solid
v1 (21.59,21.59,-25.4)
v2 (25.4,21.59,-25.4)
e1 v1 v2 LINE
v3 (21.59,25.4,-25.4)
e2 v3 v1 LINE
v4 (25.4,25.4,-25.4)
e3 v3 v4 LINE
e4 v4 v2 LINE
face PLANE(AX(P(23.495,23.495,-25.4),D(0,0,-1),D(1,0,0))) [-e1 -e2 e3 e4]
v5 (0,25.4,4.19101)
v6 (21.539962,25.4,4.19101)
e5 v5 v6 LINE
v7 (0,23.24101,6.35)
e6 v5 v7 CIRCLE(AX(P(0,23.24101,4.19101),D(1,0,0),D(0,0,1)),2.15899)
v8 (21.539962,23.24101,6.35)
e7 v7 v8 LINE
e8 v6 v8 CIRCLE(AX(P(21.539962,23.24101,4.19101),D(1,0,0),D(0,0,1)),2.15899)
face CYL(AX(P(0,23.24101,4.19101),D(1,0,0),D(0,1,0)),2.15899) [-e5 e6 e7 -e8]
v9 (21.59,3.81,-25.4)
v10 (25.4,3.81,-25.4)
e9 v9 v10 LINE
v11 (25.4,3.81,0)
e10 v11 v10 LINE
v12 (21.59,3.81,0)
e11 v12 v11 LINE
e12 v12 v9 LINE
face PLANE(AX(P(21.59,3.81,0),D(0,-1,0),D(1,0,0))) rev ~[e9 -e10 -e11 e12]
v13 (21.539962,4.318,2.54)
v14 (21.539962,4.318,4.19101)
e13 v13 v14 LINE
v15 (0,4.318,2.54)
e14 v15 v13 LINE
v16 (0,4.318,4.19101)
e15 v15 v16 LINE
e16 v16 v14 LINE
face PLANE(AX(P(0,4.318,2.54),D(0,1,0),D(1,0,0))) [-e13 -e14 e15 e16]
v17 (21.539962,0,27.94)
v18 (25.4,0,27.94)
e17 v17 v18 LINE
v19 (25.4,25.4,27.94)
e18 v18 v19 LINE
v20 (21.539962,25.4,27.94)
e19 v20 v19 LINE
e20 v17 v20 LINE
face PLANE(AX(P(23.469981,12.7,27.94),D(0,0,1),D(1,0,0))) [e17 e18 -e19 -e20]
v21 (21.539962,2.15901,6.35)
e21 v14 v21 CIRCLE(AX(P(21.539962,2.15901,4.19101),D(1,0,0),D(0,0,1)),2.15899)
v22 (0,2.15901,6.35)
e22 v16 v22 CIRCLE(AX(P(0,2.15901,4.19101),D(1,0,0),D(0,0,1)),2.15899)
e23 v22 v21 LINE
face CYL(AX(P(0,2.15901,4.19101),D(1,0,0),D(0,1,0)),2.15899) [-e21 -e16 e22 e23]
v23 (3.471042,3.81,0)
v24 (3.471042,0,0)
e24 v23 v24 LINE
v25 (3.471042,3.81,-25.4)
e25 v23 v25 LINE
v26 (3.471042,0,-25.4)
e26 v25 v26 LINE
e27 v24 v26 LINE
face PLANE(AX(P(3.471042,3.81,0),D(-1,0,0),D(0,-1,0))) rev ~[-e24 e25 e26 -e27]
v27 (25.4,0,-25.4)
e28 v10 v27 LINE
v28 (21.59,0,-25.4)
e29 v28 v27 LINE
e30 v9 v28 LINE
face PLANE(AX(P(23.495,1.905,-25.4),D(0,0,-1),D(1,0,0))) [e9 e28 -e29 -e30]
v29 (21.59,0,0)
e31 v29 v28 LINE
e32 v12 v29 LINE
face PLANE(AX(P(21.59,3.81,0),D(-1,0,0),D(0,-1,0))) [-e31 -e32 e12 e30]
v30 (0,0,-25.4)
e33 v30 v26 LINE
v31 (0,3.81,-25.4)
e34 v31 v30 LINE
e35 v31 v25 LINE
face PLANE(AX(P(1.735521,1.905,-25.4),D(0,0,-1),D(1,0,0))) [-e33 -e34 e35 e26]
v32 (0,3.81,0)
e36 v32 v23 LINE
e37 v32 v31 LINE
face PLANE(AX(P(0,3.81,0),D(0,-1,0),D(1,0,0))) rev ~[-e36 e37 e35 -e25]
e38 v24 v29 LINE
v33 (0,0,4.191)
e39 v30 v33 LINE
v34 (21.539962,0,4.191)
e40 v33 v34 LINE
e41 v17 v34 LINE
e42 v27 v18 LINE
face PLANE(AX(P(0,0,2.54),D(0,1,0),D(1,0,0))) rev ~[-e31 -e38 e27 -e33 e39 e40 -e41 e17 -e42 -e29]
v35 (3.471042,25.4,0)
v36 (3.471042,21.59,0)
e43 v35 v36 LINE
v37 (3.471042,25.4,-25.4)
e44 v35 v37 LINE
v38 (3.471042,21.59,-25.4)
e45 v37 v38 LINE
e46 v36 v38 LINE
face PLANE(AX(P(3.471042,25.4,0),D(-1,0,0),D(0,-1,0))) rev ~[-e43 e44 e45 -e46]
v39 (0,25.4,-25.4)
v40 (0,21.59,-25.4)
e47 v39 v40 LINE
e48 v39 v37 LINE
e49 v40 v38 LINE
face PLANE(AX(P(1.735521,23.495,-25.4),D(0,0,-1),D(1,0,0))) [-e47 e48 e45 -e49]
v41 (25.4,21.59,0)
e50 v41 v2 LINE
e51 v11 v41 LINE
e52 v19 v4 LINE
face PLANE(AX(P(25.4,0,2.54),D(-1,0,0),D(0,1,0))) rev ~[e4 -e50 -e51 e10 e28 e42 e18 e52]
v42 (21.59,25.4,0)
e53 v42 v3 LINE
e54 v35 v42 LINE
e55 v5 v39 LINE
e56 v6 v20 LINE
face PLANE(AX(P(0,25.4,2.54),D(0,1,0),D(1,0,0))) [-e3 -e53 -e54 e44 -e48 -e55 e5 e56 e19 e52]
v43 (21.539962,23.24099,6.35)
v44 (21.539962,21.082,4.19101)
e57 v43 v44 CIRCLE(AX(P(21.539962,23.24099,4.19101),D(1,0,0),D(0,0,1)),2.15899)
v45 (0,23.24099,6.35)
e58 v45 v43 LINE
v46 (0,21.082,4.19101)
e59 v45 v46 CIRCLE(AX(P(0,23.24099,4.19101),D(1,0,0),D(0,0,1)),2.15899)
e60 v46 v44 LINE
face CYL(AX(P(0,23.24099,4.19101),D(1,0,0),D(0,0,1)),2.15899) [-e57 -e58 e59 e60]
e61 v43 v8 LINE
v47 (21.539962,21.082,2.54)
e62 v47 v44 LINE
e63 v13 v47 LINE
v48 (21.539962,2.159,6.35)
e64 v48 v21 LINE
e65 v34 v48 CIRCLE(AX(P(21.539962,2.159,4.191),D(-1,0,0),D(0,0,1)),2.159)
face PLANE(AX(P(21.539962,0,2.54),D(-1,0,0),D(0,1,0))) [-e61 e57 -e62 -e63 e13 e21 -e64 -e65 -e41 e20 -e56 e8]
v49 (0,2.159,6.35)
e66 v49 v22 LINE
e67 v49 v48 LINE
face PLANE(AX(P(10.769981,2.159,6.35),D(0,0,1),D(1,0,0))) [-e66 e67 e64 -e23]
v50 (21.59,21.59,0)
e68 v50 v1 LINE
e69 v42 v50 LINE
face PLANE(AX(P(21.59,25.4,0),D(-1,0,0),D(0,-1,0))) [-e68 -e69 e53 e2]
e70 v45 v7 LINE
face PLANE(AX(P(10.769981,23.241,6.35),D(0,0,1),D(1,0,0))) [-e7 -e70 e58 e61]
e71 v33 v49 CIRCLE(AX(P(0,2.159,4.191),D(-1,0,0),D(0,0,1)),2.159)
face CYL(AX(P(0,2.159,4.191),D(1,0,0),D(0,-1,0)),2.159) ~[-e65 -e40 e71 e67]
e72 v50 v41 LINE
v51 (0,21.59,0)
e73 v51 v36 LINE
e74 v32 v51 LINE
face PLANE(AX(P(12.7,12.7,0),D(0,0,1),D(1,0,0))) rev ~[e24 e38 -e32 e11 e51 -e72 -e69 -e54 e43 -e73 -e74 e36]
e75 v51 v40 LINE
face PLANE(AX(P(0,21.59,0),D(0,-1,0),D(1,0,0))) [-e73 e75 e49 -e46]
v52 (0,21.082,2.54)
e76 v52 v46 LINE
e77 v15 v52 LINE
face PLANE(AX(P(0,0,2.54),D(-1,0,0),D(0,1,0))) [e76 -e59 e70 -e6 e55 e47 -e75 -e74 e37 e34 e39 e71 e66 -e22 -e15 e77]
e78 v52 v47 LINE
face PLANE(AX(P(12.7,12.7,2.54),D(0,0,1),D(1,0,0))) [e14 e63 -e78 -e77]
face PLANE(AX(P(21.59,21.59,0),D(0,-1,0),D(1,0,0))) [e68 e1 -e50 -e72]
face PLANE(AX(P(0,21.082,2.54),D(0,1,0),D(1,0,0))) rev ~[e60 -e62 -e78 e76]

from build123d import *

# Parameters (mm, degrees)
F0_W      = 25.4
F0_H      = 25.4
F1_DEPTH  = 2.54
F2_W      = 3.4710424952
F2_H      = 3.81
F2_W_2    = 3.81
F3_DEPTH  = 25.4
F4_W      = 3.8600380808
F4_H      = 25.4
F5_DEPTH  = 25.4
F6_W      = 21.5399619192
F6_H      = 4.318
F7_DEPTH  = 3.81
F8_R      = 2.15899
F9_W      = 21.5399619192
F9_H      = 4.318
F10_DEPTH = 3.81
F11_R     = 2.159
F12_R     = 2.15899


# Not quite as in the source:
# - a fillet or chamfer is up to 0.001 mm smaller than in the source, because OpenCascade refuses the exact size


with BuildPart() as f1:
    # F0 (on Top) → F1 (new body)
    with BuildSketch(Plane.XY):
        with Locations((12.7, 12.7)):
            Rectangle(F0_W, F0_H)
    extrude(amount=F1_DEPTH)

    # F2 (on face) → F3 (join)
    with BuildSketch(Plane(origin=(0, 0, 0), x_dir=(1, 0, 0), z_dir=(0, 0, -1))):
        with Locations((1.7355212476, -1.905)):
            Rectangle(F2_W, F2_H)
        with Locations((23.495, -1.905)):
            Rectangle(F2_W_2, F2_H)
        with Locations((1.7355212476, -23.495)):
            Rectangle(F2_W, F2_H)
        with Locations((23.495, -23.495)):
            Rectangle(F2_W_2, F2_H)
    extrude(amount=F3_DEPTH)

    # F4 (on face) → F5 (join)
    with BuildSketch(Plane.XY.offset(2.54)):
        with Locations((23.4699809596, 12.7)):
            Rectangle(F4_W, F4_H)
    extrude(amount=F5_DEPTH)

    # F6 (on face) → F7 (join)
    with BuildSketch(Plane.XY.offset(2.54)):
        with Locations((10.7699809596, 23.241)):
            Rectangle(F6_W, F6_H)
    extrude(amount=F7_DEPTH)

    # F8 (radius 2.159 in the source; OpenCascade refuses exactly that, so slightly less here)
    f8_edges = [f1.edges().sort_by_distance(p)[0] for p in [
        (10.769981, 25.4, 6.35),
        (10.769981, 21.082, 6.35),
    ]]
    fillet(f8_edges, radius=F8_R)

    # F9 (on face) → F10 (join)
    with BuildSketch(Plane.XY.offset(2.54)):
        with Locations((10.7699809596, 2.159)):
            Rectangle(F9_W, F9_H)
    extrude(amount=F10_DEPTH)

    # F11
    f11_edges = [f1.edges().sort_by_distance(p)[0] for p in [
        (10.769981, 0, 6.35),
    ]]
    fillet(f11_edges, radius=F11_R)

    # F12 (radius 2.159 in the source; OpenCascade refuses exactly that, so slightly less here)
    f12_edges = [f1.edges().sort_by_distance(p)[0] for p in [
        (10.769981, 4.318, 6.35),
    ]]
    fillet(f12_edges, radius=F12_R)


solid = f1.part
